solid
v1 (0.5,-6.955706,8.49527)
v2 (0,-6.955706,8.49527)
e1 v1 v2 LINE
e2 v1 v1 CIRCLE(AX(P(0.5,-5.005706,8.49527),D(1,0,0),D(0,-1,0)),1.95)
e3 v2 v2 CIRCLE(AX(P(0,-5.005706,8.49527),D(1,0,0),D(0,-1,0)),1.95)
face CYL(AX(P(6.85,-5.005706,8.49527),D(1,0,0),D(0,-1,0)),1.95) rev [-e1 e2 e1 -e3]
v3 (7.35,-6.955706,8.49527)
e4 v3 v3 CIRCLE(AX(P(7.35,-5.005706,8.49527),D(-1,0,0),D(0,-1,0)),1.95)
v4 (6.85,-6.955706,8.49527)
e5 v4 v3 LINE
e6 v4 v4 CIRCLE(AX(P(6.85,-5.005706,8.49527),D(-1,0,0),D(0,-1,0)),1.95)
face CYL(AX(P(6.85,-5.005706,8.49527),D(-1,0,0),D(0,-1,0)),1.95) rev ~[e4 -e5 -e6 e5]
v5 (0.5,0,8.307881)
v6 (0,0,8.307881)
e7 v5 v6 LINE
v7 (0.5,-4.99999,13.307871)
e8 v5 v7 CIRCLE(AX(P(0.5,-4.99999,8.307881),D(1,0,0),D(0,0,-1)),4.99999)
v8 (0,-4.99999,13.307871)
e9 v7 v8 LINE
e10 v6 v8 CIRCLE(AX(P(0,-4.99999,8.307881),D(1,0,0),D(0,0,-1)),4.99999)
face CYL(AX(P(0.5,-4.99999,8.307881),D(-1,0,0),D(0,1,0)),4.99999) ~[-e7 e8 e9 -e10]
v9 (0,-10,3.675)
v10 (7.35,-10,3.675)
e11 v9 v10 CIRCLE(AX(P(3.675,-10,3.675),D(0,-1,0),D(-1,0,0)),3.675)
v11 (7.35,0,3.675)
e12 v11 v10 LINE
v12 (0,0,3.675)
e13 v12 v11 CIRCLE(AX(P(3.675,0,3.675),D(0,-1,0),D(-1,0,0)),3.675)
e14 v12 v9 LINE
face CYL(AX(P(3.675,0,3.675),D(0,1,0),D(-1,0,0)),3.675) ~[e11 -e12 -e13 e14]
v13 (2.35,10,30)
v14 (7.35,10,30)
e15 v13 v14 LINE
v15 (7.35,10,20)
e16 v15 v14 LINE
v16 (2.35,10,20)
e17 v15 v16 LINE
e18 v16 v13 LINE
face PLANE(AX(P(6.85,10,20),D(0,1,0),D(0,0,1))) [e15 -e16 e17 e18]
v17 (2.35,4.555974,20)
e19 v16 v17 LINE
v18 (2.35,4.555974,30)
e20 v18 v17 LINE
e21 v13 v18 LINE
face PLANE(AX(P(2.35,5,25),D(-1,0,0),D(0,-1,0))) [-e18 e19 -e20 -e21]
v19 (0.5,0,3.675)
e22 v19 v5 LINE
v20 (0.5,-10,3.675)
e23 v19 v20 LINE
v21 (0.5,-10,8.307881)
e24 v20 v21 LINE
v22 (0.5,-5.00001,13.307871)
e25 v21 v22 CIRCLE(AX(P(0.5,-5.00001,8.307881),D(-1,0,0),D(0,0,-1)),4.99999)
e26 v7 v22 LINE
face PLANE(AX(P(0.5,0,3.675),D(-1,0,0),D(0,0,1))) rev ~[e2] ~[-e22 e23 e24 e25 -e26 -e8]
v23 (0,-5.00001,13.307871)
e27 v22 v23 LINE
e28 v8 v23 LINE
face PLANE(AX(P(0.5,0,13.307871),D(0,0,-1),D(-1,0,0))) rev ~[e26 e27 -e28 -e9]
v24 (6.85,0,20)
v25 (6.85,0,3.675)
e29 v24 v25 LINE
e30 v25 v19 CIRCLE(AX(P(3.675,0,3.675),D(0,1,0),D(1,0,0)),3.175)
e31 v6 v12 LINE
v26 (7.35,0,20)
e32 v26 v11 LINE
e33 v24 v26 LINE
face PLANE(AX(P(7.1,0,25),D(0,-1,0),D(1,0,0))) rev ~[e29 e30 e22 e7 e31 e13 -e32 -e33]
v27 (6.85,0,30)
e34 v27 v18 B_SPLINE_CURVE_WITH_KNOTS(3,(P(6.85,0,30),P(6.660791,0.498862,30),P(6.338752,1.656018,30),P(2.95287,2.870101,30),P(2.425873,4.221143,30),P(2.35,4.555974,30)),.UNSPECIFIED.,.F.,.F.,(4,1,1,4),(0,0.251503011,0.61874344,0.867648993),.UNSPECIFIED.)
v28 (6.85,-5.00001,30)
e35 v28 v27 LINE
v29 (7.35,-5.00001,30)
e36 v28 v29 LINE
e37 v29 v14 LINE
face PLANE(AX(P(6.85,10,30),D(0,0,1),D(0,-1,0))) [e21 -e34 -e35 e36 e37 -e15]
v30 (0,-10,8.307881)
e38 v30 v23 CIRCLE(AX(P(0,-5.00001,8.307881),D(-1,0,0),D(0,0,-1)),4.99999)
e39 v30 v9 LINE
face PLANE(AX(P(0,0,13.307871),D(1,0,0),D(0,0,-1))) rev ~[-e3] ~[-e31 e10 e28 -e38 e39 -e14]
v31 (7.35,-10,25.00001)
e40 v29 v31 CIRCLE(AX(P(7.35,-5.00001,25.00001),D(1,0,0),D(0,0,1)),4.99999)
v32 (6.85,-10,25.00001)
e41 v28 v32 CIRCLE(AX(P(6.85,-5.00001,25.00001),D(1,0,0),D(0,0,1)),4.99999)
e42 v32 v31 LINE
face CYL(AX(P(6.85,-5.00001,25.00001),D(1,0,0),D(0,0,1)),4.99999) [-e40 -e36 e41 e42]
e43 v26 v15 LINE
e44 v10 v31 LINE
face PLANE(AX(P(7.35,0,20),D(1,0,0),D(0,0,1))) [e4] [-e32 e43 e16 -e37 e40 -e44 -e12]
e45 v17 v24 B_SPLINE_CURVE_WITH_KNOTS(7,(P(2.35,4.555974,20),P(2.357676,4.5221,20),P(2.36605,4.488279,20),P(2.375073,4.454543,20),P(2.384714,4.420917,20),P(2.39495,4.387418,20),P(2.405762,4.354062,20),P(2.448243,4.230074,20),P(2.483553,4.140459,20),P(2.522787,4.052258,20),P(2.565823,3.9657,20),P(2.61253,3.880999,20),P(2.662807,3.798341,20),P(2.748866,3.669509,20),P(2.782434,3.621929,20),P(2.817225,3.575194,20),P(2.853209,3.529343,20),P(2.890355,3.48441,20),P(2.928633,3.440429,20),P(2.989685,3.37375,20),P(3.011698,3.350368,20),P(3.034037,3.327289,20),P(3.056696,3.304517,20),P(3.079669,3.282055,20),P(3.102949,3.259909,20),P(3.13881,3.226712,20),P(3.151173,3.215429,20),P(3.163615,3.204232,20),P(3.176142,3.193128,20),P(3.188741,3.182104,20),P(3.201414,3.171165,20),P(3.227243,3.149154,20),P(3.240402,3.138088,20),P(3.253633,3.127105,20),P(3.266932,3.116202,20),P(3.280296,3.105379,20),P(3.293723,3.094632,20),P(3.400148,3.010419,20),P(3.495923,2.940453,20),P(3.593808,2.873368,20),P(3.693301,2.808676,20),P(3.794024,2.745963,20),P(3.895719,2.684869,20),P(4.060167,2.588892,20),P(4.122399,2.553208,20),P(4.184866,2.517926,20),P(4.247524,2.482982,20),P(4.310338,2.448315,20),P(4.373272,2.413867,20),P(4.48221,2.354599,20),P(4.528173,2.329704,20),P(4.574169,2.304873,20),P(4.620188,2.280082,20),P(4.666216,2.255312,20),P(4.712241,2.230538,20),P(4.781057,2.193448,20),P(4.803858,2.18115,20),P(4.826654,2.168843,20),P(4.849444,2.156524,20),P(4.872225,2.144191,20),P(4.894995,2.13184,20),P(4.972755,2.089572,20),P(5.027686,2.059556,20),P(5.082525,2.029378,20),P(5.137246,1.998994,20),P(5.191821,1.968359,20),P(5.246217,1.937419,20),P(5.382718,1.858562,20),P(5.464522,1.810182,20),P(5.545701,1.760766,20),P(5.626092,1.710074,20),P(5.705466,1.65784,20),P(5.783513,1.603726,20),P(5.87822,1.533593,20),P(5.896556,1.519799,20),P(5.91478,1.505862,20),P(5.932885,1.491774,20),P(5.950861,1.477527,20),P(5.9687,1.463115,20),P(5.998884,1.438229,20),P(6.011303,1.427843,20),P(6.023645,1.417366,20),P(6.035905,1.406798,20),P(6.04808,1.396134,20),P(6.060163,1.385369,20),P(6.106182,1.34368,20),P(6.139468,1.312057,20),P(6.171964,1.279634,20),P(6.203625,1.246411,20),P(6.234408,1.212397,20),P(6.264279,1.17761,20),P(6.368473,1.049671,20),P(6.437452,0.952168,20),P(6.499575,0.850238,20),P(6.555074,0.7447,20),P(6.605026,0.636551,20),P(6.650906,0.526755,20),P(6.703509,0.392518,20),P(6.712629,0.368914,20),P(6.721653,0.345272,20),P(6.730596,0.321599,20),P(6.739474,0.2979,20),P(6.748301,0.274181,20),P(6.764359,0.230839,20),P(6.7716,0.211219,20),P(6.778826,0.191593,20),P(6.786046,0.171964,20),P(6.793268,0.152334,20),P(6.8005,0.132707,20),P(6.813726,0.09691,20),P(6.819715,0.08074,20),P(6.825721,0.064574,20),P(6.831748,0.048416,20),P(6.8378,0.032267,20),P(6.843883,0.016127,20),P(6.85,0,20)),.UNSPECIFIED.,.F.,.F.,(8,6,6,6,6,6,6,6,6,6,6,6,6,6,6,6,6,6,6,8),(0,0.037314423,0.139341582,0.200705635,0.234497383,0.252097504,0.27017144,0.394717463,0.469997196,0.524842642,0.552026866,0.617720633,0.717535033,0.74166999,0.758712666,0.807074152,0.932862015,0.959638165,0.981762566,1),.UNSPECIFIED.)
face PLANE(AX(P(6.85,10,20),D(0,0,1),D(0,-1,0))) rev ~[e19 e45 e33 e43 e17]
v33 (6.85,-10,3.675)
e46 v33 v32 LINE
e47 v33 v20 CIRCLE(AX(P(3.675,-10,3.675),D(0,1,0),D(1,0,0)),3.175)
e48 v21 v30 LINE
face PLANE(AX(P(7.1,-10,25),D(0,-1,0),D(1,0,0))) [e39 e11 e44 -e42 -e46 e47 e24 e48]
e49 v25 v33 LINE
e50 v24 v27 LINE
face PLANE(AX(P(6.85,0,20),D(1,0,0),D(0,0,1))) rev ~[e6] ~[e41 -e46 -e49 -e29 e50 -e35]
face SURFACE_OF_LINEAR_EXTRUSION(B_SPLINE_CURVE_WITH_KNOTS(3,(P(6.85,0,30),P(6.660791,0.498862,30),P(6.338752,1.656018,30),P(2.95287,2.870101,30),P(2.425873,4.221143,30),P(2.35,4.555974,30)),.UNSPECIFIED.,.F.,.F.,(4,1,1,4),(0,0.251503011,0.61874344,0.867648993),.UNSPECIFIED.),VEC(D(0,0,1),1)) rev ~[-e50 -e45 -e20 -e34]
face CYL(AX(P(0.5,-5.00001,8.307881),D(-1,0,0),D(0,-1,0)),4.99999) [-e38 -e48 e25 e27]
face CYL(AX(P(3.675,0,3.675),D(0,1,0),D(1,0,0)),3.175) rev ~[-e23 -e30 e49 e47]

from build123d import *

# Parameters (mm, degrees)
F1_DEPTH  = 10
F0_W      = 0.5
F0_H      = 10
F2_DEPTH  = 10
F3_DEPTH  = 10
F4_R      = 1.95
F5_DEPTH  = 25
F6_DEPTH  = 25
F7_R      = 4.99999
F4_W      = 10
F4_H      = 10
F8_DEPTH  = 4.5
F10_DEPTH = 25


# Not quite as in the source:
# - a fillet or chamfer is up to 0.001 mm smaller than in the source, because OpenCascade refuses the exact size


with BuildPart() as f1:
    # F0 (on Front) → F1 (new body)
    with BuildSketch(Plane.XZ):
        with BuildLine():
            Line((0.5, 3.675), (0, 3.675))
            ThreePointArc((0, 3.675), (3.675, 0), (7.35, 3.675))
            Line((7.35, 3.675), (7.35, 20))
            Line((7.35, 20), (6.85, 20))
            Line((6.85, 20), (6.85, 3.675))
            ThreePointArc((6.85, 3.675), (3.675, 0.5), (0.5, 3.675))
        make_face()
        Polygon((0, 11.5236516859), (0, 3.675), (0.5, 3.675), (0.5, 13.3078707406), (0, 13.3078707406), align=None)
    extrude(amount=F1_DEPTH)

    # F0 (on Front) → F2 (join)
    with BuildSketch(Plane.XZ):
        with Locations((7.1, 25)):
            Rectangle(F0_W, F0_H)
    extrude(amount=F2_DEPTH)

    # F0 (on Front) → F3 (join)
    with BuildSketch(Plane.XZ):
        with Locations((7.1, 25)):
            Rectangle(F0_W, F0_H)
    extrude(amount=-F3_DEPTH)

    # F4 (on face) → F5 (cut)
    with BuildSketch(Plane(origin=(6.85, 0, 0), x_dir=(0, -1, 0), z_dir=(-1, 0, 0))):
        with Locations((5.0057064388, 8.4952701442)):
            Circle(F4_R)
    extrude(amount=-F5_DEPTH, mode=Mode.SUBTRACT)

    # F4 (on face) → F6 (cut)
    with BuildSketch(Plane(origin=(6.85, 0, 0), x_dir=(0, -1, 0), z_dir=(-1, 0, 0))):
        with Locations((5.0057064388, 8.4952701442)):
            Circle(F4_R)
    extrude(amount=F6_DEPTH, mode=Mode.SUBTRACT)

    # F7 (radius 5 in the source; OpenCascade refuses exactly that, so slightly less here)
    f7_edges = [f1.edges().sort_by_distance(p)[0] for p in [
        (7.1, -10, 30),
        (0.25, -10, 13.307871),
        (0.25, 0, 13.307871),
    ]]
    fillet(f7_edges, radius=F7_R)

    # F4 (on face) → F8 (join)
    with BuildSketch(Plane(origin=(6.85, 0, 0), x_dir=(0, -1, 0), z_dir=(-1, 0, 0))):
        with Locations((-5, 25)):
            Rectangle(F4_W, F4_H)
    extrude(amount=F8_DEPTH)

    # F9 (on face) → F10 (cut)
    with BuildSketch(Plane.XY.offset(30)):
        with BuildLine():
            Line((2.35, 0), (6.85, 0))
            add(Edge.make_bspline(
                [(6.85, 0), (6.6607907806, 0.4988620131), (6.3387521568, 1.6560182736), (2.9528697619, 2.8701009159), (2.4258734683, 4.2211432066), (2.35, 4.5559741557)],
                knots=[0, 0, 0, 0, 0.2515030108, 0.6187434404, 0.8676489933, 0.8676489933, 0.8676489933, 0.8676489933], degree=3))
            Line((2.35, 4.5559741557), (2.35, 0))
        make_face()
    extrude(amount=-F10_DEPTH, mode=Mode.SUBTRACT)


solid = f1.part
